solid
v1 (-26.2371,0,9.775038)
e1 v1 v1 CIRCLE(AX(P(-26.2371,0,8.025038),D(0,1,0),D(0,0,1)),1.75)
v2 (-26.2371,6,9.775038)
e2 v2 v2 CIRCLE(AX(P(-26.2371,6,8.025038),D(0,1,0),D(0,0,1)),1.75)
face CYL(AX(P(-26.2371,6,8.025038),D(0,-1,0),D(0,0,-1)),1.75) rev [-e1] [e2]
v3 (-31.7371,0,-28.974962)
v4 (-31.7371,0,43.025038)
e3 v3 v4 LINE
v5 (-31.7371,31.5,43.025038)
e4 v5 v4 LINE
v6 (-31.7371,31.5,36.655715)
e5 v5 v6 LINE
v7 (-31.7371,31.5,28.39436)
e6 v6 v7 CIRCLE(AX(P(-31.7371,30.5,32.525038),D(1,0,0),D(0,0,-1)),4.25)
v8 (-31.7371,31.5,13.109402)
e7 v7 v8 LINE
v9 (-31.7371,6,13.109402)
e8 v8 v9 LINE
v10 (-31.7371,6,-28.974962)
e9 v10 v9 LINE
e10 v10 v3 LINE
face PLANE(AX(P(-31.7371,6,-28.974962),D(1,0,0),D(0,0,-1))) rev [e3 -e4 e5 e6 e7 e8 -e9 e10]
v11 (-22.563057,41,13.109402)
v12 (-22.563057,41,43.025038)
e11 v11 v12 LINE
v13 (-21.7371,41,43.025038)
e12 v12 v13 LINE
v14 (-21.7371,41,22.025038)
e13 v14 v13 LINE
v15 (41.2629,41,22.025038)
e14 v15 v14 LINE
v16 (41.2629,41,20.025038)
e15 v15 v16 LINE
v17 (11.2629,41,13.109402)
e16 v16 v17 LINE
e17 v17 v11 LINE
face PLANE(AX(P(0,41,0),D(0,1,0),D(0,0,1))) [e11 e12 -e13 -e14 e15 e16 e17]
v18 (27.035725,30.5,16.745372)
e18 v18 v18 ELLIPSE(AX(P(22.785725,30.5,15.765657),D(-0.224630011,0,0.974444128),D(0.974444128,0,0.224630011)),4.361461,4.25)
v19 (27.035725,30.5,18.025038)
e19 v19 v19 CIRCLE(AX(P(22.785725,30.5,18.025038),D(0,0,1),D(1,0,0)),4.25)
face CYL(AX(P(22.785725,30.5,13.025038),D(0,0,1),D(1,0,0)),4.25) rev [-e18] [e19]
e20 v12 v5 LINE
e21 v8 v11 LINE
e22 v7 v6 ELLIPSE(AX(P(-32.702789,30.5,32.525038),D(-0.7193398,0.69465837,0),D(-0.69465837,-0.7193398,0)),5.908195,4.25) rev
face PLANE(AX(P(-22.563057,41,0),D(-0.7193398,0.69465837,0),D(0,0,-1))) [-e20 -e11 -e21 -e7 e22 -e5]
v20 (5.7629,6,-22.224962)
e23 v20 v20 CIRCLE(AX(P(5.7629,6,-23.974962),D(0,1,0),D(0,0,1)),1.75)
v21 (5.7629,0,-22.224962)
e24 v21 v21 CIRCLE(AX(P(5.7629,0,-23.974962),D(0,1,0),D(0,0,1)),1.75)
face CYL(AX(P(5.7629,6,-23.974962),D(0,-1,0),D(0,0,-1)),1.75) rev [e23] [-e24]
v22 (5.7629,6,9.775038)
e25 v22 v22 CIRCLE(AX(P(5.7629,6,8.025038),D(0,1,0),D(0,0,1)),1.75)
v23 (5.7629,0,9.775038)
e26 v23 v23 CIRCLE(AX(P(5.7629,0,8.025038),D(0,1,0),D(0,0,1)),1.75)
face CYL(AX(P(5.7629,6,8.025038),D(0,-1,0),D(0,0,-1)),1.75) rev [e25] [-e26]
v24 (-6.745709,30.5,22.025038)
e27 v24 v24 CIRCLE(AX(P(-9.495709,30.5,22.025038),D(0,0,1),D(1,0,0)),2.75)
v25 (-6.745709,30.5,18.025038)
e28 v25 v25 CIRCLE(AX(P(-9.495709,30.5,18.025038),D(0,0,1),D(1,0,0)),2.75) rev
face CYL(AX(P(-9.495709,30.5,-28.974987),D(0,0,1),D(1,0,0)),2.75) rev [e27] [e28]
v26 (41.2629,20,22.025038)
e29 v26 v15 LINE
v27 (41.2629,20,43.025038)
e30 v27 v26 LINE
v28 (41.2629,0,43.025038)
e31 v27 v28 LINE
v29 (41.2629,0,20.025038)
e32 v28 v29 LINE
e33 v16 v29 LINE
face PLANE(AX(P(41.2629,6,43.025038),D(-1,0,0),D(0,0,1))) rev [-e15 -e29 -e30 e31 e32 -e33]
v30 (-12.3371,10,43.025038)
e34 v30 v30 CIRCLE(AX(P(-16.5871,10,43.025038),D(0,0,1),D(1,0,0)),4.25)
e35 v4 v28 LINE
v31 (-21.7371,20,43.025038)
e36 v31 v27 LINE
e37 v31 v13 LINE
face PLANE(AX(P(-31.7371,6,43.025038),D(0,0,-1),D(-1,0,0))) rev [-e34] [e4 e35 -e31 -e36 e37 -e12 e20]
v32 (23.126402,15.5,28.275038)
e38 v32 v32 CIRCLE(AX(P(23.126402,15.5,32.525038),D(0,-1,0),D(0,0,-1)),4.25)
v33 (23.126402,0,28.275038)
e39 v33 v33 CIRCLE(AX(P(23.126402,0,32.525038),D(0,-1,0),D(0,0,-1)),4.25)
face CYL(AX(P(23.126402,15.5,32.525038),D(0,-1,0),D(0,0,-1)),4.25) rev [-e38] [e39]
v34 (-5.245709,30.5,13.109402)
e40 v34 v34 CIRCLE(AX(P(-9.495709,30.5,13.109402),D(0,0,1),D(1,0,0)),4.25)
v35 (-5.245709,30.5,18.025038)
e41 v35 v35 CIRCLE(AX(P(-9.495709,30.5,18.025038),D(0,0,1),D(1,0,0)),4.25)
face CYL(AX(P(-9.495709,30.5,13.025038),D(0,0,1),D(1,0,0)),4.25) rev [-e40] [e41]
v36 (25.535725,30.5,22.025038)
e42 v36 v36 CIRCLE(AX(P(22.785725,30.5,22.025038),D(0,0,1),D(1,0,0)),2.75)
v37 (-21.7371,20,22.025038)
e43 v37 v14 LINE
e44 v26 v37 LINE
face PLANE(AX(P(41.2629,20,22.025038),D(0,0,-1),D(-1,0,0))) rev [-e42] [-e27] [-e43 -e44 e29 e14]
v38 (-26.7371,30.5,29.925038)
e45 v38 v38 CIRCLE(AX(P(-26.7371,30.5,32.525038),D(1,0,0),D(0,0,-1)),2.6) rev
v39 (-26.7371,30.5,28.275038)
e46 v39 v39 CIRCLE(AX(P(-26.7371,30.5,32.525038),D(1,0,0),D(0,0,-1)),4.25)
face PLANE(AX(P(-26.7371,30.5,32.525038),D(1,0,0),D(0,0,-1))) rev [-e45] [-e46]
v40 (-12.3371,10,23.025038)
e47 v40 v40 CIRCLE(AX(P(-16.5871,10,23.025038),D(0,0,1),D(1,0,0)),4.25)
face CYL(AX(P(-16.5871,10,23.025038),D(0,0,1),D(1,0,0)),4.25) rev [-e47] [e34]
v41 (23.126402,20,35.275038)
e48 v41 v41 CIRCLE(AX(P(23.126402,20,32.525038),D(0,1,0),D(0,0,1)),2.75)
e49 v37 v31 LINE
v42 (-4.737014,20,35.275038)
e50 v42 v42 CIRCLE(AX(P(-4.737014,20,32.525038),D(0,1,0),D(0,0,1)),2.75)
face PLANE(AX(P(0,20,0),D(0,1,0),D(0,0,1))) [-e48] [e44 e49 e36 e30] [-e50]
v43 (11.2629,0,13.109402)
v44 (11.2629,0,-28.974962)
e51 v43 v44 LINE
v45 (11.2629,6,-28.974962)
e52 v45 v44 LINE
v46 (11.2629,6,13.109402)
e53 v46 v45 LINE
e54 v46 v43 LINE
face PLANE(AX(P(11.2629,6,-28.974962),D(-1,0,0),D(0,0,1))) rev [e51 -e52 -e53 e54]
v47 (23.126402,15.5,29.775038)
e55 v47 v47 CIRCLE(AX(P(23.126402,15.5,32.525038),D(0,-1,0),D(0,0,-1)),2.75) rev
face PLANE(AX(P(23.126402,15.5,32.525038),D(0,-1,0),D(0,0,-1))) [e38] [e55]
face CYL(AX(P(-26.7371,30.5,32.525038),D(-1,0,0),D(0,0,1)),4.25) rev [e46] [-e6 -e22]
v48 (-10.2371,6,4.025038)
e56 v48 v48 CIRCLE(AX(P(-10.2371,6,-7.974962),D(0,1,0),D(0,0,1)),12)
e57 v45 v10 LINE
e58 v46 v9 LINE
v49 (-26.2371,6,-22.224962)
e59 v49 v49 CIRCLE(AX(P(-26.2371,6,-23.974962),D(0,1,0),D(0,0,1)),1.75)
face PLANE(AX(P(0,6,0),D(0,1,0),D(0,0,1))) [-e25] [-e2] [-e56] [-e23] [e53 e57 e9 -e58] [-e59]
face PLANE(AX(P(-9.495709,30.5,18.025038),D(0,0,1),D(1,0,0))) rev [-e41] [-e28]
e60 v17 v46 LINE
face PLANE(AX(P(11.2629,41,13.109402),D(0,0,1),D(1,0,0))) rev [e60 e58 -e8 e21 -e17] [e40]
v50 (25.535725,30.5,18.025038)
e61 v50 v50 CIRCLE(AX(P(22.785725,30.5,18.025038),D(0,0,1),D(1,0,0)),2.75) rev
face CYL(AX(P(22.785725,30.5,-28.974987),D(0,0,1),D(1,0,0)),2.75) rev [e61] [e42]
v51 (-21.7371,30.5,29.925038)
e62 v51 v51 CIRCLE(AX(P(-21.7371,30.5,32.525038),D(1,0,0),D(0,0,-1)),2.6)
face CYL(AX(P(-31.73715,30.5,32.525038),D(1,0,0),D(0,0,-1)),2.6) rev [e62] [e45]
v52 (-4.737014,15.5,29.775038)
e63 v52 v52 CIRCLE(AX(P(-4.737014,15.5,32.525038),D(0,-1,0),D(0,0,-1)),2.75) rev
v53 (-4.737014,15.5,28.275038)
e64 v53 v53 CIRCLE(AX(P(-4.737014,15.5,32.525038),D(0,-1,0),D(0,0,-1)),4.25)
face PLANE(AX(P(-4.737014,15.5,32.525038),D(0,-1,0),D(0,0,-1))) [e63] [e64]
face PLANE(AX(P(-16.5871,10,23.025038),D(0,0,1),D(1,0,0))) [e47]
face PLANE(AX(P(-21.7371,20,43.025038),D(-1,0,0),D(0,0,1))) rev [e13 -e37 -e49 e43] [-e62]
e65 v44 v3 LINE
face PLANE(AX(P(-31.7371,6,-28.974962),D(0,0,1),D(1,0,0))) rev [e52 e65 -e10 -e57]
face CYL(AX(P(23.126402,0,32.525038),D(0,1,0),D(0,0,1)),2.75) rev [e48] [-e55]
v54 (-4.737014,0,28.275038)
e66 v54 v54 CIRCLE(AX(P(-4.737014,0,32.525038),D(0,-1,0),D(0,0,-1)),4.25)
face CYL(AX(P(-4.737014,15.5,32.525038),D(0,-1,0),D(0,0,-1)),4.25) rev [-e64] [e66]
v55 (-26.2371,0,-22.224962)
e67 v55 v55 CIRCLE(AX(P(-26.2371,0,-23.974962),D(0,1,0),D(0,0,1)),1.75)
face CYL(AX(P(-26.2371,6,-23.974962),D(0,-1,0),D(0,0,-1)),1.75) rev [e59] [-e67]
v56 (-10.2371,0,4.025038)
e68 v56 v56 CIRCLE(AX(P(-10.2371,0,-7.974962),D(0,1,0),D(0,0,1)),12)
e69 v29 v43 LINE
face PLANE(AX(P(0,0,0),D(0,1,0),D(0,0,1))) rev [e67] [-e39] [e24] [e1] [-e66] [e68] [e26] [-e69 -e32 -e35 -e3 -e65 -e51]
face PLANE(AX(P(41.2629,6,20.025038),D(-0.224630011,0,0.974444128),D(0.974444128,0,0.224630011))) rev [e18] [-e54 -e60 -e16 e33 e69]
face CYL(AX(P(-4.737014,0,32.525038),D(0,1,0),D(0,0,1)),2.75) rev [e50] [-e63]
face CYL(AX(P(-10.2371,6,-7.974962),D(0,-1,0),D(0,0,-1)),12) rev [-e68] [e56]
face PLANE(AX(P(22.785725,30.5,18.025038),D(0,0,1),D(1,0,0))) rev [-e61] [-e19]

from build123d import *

# Parameters (mm, degrees)
SKETCH_1_R          = 12
SKETCH_1_R_2        = 1.75
EXTRUDE_1_DEPTH     = 6
EXTRUDE_2_DEPTH     = 35
SKETCH_3_W          = 63
SKETCH_3_H          = 21
CUT_EXTRUDE_1_DEPTH = 21
SKETCH_4_R          = 2.6
CUT_EXTRUDE_2_DEPTH = 87.609201921
CHAMFER_1_SIZE      = 9.5
CHAMFER_1_SIZE_2    = 9.174043361
CUT_EXTRUDE_START   = -10
SKETCH_5_R          = 4.25
CUT_EXTRUDE_3_DEPTH = 5
SKETCH_6_R          = 2.75
CUT_EXTRUDE_4_DEPTH = 78.360370477
CUT_EXTRUDE_START_2 = -4
SKETCH_7_R          = 4.25
CUT_EXTRUDE_5_DEPTH = 5
SKETCH_8_R          = 2.75
CUT_EXTRUDE_6_DEPTH = 64.20427816
SKETCH_10_R         = 4.25
CUT_EXTRUDE_7_DEPTH = 15.5
SKETCH_11_R         = 4.25
CUT_EXTRUDE_8_DEPTH = 20


with BuildPart() as part:
    # Эскиз1 → Бобышка-Вытянуть1 (new body)
    with BuildSketch(Plane(origin=(0, 0, 0), x_dir=(1, 0, 0), z_dir=(0, 1, 0))):
        Polygon((-31.737099952, -43.025037564), (41.262900048, -43.025037564), (41.262900048, -20.025037564), (11.262900048, -13.109402144), (11.262900048, 28.974962436), (-31.737099952, 28.974962436), align=None)
        with Locations(Location((-10.237099952, 7.974962436, 0), (0, 0, 270))):
            Circle(SKETCH_1_R, mode=Mode.SUBTRACT)
        with Locations(Location((-26.237099952, 23.974962436, 0), (0, 0, 270))):
            Circle(SKETCH_1_R_2, mode=Mode.SUBTRACT)
        with Locations(Location((5.762900048, 23.974962436, 0), (0, 0, 270))):
            Circle(SKETCH_1_R_2, mode=Mode.SUBTRACT)
        with Locations(Location((5.762900048, -8.025037564, 0), (0, 0, 270))):
            Circle(SKETCH_1_R_2, mode=Mode.SUBTRACT)
        with Locations(Location((-26.237099952, -8.025037564, 0), (0, 0, 270))):
            Circle(SKETCH_1_R_2, mode=Mode.SUBTRACT)
    extrude(amount=EXTRUDE_1_DEPTH)

    # Эскиз2 → Бобышка-Вытянуть2 (add)
    with BuildSketch(Plane(origin=(0, 6, 0), x_dir=(1, 0, 0), z_dir=(0, 1, 0))):
        Polygon((41.262900048, -20.025037564), (11.262900048, -13.109402144), (-31.737099952, -13.109402144), (-31.737099952, -43.025037564), (41.262900048, -43.025037564), align=None)
    extrude(amount=EXTRUDE_2_DEPTH)

    # Эскиз3 → Вырез-Вытянуть1 (cut)
    with BuildSketch(Plane(origin=(0, 41, 0), x_dir=(1, 0, 0), z_dir=(0, 1, 0))):
        with Locations((9.762900048, -32.525037564)):
            Rectangle(SKETCH_3_W, SKETCH_3_H)
    extrude(amount=-CUT_EXTRUDE_1_DEPTH, mode=Mode.SUBTRACT)

    # Эскиз4 → Вырез-Вытянуть2 (cut, through all)
    with BuildSketch(Plane(origin=(-21.737099952, 0, 0), x_dir=(0, 0, -1), z_dir=(1, 0, 0))):
        with Locations((-32.525037564, 30.5)):
            Circle(SKETCH_4_R)
    extrude(amount=-CUT_EXTRUDE_2_DEPTH, mode=Mode.SUBTRACT)

    # Фаска1
    # the kernel refuses this chamfer: 9.5, 9.174043361 mm, written as the material it takes off along each edge
    with BuildSketch(Plane(origin=(-31.737099952, 41, -11.332881065), x_dir=(-0.026999337430198715, -0.9996354514413394, 0), z_dir=(0, 0, 1))) as chamfer_1_piece_1:
        Polygon((CHAMFER_1_SIZE * 0.999635451441, CHAMFER_1_SIZE * 0.0269993374302), (-CHAMFER_1_SIZE_2 * 0.0269993374292, CHAMFER_1_SIZE_2 * 0.999635451405), (0, 0), align=None)
    extrude(amount=78.800201839, mode=Mode.SUBTRACT)

    # Эскиз5 → Вырез-Вытянуть3 (cut)
    with BuildSketch(Plane(origin=(-21.737099952, 0, 0), x_dir=(0, 0, -1), z_dir=(1, 0, 0)).offset(CUT_EXTRUDE_START)):
        with Locations(Location((-32.525037564, 30.5, 0), (0, 0, 166.391039369))):
            Circle(SKETCH_5_R)
    extrude(amount=CUT_EXTRUDE_3_DEPTH, mode=Mode.SUBTRACT)

    # Эскиз6 → Вырез-Вытянуть4 (cut, through all)
    with BuildSketch(Plane.XY.offset(22.025037564)):
        with Locations((-9.495708976, 30.5)):
            Circle(SKETCH_6_R)
        with Locations((22.785725254, 30.5)):
            Circle(SKETCH_6_R)
    extrude(amount=-CUT_EXTRUDE_4_DEPTH, mode=Mode.SUBTRACT)

    # Эскиз7 → Вырез-Вытянуть5 (cut)
    with BuildSketch(Plane.XY.offset(22.025037564).offset(CUT_EXTRUDE_START_2)):
        with Locations((-9.495708976, 30.5)):
            Circle(SKETCH_7_R)
        with Locations((22.785725254, 30.5)):
            Circle(SKETCH_7_R)
    extrude(amount=-CUT_EXTRUDE_5_DEPTH, mode=Mode.SUBTRACT)

    # Эскиз8 → Вырез-Вытянуть6 (cut, through all)
    with BuildSketch(Plane(origin=(0, 20, 0), x_dir=(1, 0, 0), z_dir=(0, 1, 0))):
        with Locations(Location((-4.737013791, -32.525037564, 0), (0, 0, 270))):
            Circle(SKETCH_8_R)
        with Locations(Location((23.126402015, -32.525037564, 0), (0, 0, 270))):
            Circle(SKETCH_8_R)
    extrude(amount=-CUT_EXTRUDE_6_DEPTH, mode=Mode.SUBTRACT)

    # Эскиз10 → Вырез-Вытянуть7 (cut)
    with BuildSketch(Plane.XZ):
        with Locations(Location((23.126402015, 32.525037564, 0), (0, 0, 270))):
            Circle(SKETCH_10_R)
        with Locations(Location((-4.737013791, 32.525037564, 0), (0, 0, 270))):
            Circle(SKETCH_10_R)
    extrude(amount=-CUT_EXTRUDE_7_DEPTH, mode=Mode.SUBTRACT)

    # Эскиз11 → Вырез-Вытянуть8 (cut)
    with BuildSketch(Plane.XY.offset(43.025037564)):
        with Locations((-16.587099952, 10)):
            Circle(SKETCH_11_R)
    extrude(amount=-CUT_EXTRUDE_8_DEPTH, mode=Mode.SUBTRACT)


solid = part.part
